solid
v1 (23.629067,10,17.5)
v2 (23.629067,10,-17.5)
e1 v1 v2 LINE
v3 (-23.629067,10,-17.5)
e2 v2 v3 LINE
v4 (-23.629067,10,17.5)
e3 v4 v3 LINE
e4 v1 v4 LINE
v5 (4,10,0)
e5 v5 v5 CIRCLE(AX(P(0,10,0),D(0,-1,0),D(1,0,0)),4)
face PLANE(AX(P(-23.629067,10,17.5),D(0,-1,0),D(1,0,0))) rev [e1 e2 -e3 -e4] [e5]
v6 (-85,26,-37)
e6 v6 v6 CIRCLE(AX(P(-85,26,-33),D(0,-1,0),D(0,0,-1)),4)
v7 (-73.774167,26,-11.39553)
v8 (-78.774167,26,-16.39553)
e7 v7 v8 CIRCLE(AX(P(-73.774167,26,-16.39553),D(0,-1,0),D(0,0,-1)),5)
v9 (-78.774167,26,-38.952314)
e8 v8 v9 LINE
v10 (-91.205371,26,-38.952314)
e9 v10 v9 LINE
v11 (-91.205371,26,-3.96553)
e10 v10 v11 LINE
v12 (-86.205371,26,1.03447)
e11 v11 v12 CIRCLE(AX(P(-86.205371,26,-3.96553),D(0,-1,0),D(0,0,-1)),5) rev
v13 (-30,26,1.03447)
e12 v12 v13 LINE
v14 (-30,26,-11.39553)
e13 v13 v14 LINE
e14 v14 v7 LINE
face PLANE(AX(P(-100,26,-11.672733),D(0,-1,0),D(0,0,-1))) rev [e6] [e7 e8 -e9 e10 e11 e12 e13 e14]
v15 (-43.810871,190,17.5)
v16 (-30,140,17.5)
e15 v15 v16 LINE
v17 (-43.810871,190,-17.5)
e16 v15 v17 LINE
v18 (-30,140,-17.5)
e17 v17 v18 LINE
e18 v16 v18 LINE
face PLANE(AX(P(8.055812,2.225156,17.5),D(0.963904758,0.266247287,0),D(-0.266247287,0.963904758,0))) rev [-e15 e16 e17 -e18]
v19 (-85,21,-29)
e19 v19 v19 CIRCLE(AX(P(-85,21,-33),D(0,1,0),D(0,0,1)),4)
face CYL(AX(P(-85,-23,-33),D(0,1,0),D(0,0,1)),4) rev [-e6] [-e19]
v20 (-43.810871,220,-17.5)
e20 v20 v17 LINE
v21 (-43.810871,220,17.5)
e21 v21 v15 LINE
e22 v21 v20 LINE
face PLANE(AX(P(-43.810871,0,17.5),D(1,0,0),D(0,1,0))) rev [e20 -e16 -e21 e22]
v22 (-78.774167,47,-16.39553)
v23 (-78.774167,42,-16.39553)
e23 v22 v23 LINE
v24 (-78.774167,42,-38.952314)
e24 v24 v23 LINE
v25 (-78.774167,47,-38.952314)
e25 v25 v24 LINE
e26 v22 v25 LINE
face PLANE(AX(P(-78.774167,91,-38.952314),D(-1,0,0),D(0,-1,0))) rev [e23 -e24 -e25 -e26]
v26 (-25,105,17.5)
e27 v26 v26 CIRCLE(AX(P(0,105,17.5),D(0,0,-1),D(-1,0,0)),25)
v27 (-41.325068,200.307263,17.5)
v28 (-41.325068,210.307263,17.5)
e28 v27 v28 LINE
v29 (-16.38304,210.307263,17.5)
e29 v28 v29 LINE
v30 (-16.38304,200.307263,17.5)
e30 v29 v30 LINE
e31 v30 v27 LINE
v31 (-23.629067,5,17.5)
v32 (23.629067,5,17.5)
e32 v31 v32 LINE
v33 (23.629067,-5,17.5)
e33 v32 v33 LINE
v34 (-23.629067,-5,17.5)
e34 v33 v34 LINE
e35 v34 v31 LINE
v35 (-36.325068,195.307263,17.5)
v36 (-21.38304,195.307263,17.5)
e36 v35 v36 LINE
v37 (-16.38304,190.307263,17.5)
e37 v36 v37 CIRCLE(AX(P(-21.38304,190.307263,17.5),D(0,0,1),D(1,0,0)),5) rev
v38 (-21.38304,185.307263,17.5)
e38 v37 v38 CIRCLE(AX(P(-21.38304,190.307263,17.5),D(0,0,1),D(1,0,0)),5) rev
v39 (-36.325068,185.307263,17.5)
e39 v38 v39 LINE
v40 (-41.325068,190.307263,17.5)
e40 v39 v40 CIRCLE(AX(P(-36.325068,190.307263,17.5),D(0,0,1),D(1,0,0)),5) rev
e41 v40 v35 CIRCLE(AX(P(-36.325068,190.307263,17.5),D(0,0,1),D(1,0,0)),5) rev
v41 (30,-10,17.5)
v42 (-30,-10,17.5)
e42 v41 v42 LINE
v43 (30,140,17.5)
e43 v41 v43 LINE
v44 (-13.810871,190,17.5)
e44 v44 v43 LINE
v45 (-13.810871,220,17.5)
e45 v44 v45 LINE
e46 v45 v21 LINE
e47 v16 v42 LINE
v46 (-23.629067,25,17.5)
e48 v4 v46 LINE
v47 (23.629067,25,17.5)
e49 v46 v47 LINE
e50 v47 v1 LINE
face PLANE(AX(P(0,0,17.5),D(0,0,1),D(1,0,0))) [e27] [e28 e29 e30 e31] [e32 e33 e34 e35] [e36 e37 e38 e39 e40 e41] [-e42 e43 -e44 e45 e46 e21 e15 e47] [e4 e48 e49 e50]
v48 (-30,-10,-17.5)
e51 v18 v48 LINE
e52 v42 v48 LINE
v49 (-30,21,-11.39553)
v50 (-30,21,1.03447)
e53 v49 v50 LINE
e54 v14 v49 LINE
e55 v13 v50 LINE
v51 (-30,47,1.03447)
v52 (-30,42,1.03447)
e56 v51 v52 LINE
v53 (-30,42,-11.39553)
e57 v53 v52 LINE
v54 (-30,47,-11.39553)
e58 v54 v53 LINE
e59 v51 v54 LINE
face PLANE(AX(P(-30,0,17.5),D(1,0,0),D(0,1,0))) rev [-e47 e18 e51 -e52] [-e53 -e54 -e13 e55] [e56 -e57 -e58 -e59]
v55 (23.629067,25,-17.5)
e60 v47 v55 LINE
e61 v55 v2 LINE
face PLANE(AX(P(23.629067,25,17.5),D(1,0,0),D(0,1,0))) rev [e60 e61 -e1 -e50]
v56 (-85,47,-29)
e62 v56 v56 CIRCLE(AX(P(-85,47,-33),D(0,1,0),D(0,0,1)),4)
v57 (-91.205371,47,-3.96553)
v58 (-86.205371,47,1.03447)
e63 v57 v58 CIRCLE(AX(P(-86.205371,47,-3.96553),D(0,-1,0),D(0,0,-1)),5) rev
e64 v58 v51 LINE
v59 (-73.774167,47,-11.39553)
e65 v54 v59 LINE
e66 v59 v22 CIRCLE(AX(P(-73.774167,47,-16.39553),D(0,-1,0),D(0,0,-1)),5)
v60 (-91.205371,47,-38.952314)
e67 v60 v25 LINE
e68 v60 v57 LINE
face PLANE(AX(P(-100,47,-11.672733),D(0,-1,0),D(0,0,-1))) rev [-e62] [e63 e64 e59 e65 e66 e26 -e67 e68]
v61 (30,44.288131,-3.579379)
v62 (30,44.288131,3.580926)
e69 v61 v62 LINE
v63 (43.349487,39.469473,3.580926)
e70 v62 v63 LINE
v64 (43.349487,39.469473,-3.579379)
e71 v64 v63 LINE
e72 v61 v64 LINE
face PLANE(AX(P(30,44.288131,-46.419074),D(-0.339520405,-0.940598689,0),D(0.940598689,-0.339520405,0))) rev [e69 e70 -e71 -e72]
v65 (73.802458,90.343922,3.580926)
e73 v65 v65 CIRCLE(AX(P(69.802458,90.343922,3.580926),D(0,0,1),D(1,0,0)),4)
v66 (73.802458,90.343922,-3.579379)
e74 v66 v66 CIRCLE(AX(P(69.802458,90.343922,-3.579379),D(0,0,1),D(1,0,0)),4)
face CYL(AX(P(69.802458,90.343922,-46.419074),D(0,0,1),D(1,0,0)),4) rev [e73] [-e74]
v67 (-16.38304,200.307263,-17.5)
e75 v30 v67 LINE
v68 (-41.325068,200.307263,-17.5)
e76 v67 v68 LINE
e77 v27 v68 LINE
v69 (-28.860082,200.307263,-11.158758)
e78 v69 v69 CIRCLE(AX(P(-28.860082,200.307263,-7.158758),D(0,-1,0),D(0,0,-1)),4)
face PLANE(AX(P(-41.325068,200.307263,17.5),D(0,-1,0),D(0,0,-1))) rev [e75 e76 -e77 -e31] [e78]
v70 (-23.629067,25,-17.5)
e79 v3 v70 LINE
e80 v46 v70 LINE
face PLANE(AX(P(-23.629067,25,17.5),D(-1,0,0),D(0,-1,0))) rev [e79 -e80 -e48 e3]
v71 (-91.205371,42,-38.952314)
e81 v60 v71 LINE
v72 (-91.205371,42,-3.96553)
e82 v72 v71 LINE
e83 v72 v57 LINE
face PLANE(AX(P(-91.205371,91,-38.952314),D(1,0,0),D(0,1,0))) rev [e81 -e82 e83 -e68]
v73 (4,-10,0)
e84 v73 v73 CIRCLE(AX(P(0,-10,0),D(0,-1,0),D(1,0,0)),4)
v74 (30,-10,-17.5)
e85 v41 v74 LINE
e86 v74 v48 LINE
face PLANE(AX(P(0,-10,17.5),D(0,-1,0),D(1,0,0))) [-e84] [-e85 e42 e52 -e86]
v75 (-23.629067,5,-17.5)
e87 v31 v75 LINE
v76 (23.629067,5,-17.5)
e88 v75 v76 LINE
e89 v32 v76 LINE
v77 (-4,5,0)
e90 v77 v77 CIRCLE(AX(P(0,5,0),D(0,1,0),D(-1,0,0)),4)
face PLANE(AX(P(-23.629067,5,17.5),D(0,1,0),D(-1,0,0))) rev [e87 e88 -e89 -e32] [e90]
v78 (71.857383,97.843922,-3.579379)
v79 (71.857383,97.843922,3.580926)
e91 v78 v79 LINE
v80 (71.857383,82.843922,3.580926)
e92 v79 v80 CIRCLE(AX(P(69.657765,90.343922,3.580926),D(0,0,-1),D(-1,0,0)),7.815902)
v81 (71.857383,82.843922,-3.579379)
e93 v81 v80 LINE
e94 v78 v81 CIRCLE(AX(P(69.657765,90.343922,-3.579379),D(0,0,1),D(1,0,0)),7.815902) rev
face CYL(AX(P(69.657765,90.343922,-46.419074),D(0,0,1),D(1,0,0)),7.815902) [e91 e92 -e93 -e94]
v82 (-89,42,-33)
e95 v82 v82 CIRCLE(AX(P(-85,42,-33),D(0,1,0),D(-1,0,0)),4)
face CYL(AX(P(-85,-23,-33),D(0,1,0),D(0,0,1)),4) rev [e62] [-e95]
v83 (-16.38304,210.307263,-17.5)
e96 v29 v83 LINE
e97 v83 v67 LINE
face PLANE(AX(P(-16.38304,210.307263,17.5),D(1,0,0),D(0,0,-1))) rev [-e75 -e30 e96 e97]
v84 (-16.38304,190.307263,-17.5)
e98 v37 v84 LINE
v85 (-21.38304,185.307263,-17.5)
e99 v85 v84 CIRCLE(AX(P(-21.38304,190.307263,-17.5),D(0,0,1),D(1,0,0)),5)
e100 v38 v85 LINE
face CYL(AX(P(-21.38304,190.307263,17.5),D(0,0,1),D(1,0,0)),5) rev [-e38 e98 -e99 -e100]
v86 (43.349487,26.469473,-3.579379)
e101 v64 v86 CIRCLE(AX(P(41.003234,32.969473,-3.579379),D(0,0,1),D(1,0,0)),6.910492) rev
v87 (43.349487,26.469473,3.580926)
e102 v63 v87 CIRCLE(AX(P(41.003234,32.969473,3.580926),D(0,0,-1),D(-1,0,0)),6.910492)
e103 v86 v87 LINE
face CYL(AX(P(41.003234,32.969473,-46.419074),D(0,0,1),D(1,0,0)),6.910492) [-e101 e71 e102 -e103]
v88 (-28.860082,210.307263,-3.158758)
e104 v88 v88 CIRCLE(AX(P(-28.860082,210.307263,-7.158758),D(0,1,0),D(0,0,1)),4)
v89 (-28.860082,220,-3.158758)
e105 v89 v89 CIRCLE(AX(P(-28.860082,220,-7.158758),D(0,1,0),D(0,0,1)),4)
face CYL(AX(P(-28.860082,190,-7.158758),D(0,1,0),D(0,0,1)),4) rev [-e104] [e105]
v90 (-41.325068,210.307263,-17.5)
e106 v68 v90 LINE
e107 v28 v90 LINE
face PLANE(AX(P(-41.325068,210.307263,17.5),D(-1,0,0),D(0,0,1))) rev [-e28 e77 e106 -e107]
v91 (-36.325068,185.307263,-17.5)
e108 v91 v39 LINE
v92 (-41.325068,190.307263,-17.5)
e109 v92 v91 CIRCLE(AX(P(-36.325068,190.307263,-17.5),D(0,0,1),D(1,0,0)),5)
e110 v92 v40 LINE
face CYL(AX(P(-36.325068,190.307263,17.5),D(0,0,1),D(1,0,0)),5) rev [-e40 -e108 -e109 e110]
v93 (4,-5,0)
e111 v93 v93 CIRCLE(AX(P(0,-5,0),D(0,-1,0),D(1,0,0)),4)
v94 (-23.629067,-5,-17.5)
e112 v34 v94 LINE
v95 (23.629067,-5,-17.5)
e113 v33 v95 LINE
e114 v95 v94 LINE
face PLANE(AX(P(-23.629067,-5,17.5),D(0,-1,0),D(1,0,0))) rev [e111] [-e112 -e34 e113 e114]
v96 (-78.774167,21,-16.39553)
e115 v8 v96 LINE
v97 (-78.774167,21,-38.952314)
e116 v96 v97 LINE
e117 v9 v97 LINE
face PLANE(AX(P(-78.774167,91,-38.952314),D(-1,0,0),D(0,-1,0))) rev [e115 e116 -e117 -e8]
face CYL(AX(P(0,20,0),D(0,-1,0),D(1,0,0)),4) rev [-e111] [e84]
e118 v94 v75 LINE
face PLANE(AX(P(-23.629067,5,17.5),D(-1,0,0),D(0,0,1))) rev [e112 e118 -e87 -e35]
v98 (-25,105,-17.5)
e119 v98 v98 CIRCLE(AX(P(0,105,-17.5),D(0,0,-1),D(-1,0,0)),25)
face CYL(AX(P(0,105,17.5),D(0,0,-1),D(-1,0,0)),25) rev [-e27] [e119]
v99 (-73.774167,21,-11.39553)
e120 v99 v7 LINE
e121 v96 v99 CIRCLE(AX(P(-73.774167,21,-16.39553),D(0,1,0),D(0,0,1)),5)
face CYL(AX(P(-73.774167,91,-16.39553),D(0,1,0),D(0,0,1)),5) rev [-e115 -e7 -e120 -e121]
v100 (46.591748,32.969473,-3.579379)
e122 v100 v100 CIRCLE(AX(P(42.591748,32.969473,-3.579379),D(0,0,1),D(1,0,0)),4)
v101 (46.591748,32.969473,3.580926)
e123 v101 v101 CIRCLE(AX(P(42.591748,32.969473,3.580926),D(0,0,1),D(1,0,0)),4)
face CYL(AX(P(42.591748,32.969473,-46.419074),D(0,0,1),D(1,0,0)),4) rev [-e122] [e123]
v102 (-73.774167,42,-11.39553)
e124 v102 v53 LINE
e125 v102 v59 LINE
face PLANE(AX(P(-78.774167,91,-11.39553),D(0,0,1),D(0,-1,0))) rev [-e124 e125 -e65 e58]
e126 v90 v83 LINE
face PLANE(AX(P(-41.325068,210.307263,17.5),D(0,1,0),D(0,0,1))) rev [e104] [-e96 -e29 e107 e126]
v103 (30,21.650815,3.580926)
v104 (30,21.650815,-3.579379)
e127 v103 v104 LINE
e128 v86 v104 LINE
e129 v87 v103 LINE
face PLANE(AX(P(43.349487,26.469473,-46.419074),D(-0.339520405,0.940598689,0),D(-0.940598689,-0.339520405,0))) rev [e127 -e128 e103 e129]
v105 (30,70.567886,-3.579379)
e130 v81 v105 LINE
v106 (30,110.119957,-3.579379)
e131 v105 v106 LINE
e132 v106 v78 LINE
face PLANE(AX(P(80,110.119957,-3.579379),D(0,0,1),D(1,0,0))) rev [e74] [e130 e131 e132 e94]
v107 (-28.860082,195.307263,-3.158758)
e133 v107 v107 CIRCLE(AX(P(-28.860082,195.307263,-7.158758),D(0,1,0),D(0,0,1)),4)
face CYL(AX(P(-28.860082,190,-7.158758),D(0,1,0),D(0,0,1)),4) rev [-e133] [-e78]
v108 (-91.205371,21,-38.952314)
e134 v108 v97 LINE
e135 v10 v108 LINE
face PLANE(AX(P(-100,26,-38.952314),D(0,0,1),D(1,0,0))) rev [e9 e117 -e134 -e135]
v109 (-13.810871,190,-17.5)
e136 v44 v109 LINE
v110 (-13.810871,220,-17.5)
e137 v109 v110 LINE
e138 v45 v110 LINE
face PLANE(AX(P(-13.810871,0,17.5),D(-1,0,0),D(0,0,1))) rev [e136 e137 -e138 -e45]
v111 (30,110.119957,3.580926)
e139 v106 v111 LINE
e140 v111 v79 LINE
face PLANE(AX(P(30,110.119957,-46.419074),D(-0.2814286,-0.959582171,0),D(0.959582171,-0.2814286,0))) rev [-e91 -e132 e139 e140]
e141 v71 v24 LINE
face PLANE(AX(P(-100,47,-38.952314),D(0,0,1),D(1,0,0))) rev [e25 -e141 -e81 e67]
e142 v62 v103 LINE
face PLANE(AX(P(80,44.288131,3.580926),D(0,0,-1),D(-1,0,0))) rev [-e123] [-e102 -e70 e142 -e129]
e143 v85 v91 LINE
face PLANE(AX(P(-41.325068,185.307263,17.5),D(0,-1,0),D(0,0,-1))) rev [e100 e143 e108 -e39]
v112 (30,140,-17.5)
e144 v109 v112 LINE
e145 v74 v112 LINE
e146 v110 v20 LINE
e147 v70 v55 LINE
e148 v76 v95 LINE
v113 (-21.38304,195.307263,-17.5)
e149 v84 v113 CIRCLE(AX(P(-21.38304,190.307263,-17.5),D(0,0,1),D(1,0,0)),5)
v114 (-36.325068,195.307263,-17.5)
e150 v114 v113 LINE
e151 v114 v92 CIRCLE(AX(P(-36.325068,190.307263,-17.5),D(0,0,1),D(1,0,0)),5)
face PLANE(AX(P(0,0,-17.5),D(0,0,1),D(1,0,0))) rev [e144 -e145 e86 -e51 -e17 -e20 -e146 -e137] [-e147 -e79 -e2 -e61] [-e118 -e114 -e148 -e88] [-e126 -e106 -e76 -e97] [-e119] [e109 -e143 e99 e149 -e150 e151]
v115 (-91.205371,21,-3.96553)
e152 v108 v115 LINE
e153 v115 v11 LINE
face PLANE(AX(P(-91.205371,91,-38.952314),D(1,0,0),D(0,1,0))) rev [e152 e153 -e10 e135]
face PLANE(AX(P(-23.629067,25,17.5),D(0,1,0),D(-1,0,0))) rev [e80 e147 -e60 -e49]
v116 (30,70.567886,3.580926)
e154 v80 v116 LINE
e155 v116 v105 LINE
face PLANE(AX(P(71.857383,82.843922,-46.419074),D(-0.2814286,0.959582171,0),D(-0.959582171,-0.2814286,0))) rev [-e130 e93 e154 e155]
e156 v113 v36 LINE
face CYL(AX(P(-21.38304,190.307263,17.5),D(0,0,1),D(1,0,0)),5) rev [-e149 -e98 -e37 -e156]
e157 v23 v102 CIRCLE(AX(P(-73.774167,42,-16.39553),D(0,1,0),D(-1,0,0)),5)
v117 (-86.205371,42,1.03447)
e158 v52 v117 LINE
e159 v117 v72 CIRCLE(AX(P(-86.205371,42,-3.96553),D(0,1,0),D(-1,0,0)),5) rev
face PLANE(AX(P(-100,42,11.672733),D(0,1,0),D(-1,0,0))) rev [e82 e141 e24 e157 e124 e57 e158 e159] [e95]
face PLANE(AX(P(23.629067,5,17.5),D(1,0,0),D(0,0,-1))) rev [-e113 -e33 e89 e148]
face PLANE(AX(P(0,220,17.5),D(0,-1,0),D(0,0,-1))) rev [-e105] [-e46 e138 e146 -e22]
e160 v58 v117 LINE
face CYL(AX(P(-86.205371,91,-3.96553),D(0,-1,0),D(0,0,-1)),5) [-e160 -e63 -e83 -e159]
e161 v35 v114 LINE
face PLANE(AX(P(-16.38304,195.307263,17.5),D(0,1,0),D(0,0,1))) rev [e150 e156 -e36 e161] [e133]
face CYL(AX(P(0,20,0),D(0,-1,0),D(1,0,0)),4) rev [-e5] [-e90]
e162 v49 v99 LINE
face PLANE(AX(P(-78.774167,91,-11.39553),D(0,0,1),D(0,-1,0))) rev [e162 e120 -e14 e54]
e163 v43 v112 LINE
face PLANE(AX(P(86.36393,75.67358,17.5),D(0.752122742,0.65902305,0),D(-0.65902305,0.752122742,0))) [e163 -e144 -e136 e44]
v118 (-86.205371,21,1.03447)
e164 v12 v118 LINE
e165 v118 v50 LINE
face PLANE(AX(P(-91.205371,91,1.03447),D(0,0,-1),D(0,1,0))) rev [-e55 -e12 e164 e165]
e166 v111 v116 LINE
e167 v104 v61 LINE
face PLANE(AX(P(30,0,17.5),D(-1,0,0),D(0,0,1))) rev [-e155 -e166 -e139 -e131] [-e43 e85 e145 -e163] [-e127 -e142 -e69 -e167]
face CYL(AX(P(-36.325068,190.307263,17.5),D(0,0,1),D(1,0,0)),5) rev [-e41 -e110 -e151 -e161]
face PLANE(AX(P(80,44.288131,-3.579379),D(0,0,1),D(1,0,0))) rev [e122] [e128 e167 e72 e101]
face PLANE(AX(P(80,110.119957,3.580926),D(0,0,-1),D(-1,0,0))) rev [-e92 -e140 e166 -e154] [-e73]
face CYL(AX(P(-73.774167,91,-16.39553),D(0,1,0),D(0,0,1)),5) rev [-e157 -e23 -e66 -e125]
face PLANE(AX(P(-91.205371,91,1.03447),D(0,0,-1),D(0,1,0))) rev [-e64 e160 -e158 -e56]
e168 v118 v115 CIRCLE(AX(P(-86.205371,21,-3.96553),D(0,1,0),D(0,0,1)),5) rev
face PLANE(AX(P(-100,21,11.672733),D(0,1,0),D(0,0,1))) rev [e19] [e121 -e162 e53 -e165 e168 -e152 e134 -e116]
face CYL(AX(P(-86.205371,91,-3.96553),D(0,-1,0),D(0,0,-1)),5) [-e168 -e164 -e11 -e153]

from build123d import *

# Parameters (mm, degrees)
BOSS_EXTRUDE1_DEPTH = 17.5
SKETCH6_W           = 24.942027916
SKETCH6_H           = 10
SKETCH6_W_2         = 47.258134024
SKETCH6_H_2         = 15
CUT_EXTRUDE1_DEPTH  = 228.033901494
SKETCH7_R           = 25
CUT_EXTRUDE2_DEPTH  = 228.033901494
SKETCH8_R           = 4
CUT_EXTRUDE3_DEPTH  = 30
SKETCH10_R          = 4
CUT_EXTRUDE4_DEPTH  = 30
SKETCH11_W          = 7.160304618
SKETCH11_H          = 39.552070702
SKETCH11_H_2        = 22.637315958
BOSS_EXTRUDE2_DEPTH = 50
SKETCH13_R          = 4
CUT_EXTRUDE5_DEPTH  = 50
CUT_EXTRUDE6_DEPTH  = 50
CUT_EXTRUDE7_DEPTH  = 50
BOSS_EXTRUDE3_DEPTH = 70
SKETCH19_R          = 4
CUT_EXTRUDE8_DEPTH  = 70
SKETCH20_W          = 48.774167315
SKETCH20_H          = 27.556784468
CUT_EXTRUDE9_DEPTH  = 70
CUT_EXTRUDE10_DEPTH = 70
FILLET1_R           = 5
FILLET2_R           = 5
FILLET3_R           = 5
FILLET4_R           = 5


with BuildPart() as part:
    # Sketch1 → Boss-Extrude1 (new, symmetric)
    with BuildSketch(Plane.XY):
        Polygon((30, -10), (-30, -10), (-30, 140), (-43.810871114, 190), (-43.810871114, 220), (-13.810871114, 220), (-13.810871114, 190), (30, 140), align=None)
    extrude(amount=BOSS_EXTRUDE1_DEPTH, both=True)

    # Sketch6 → Cut-Extrude1 (cut, through all)
    with BuildSketch(Plane(origin=(0, 0, -17.5), x_dir=(-1, 0, 0), z_dir=(0, 0, -1))):
        with Locations((28.85405418, 190.307263481)):
            Rectangle(SKETCH6_W, SKETCH6_H)
        Rectangle(SKETCH6_W_2, SKETCH6_H)
        with Locations((0, 17.5)):
            Rectangle(SKETCH6_W_2, SKETCH6_H_2)
        with Locations((28.85405418, 205.307263481)):
            Rectangle(SKETCH6_W, SKETCH6_H)
    extrude(amount=-CUT_EXTRUDE1_DEPTH, mode=Mode.SUBTRACT)

    # Sketch7 → Cut-Extrude2 (cut, through all)
    with BuildSketch(Plane(origin=(0, 0, -17.5), x_dir=(-1, 0, 0), z_dir=(0, 0, -1))):
        with Locations((0, 105)):
            Circle(SKETCH7_R)
    extrude(amount=-CUT_EXTRUDE2_DEPTH, mode=Mode.SUBTRACT)

    # Sketch8 → Cut-Extrude3 (cut)
    with BuildSketch(Plane(origin=(0, 220, 0), x_dir=(1, 0, 0), z_dir=(0, 1, 0))):
        with Locations(Location((-28.860081831, 7.158757746, 0), (0, 0, 270))):
            Circle(SKETCH8_R)
    extrude(amount=-CUT_EXTRUDE3_DEPTH, mode=Mode.SUBTRACT)

    # Sketch10 → Cut-Extrude4 (cut)
    with BuildSketch(Plane.XZ.offset(10)):
        Circle(SKETCH10_R)
    extrude(amount=-CUT_EXTRUDE4_DEPTH, mode=Mode.SUBTRACT)

    # Sketch11 → Boss-Extrude2 (add)
    with BuildSketch(Plane(origin=(30, 0, 0), x_dir=(0, 0, -1), z_dir=(1, 0, 0))):
        with Locations((-0.000773436, 90.343921661)):
            Rectangle(SKETCH11_W, SKETCH11_H)
        with Locations((-0.000773436, 32.969473472)):
            Rectangle(SKETCH11_W, SKETCH11_H_2)
    extrude(amount=BOSS_EXTRUDE2_DEPTH)

    # Sketch13 → Cut-Extrude5 (cut)
    with BuildSketch(Plane.XY.offset(3.580925745)):
        with Locations((69.802457577, 90.343921661)):
            Circle(SKETCH13_R)
        with Locations((42.591748381, 32.969473472)):
            Circle(SKETCH13_R)
    extrude(amount=-CUT_EXTRUDE5_DEPTH, mode=Mode.SUBTRACT)

    # Sketch14 → Cut-Extrude6 (cut)
    with BuildSketch(Plane.XY.offset(3.580925745)):
        with BuildLine():
            Line((30, 110.119957012), (71.857382865, 97.843921661))
            ThreePointArc((71.857382865, 97.843921661), (77.47366635, 90.343921661), (71.857382865, 82.843921661))
            Line((71.857382865, 82.843921661), (30, 70.56788631))
            Line((30, 70.56788631), (80, 70.56788631))
            Line((80, 70.56788631), (80, 110.119957012))
            Line((80, 110.119957012), (30, 110.119957012))
        make_face()
    extrude(amount=-CUT_EXTRUDE6_DEPTH, mode=Mode.SUBTRACT)

    # Sketch15 → Cut-Extrude7 (cut)
    with BuildSketch(Plane.XY.offset(3.580925745)):
        with BuildLine():
            Line((30, 44.288131451), (43.349487429, 39.469473472))
            ThreePointArc((43.349487429, 39.469473472), (47.913726584, 32.969473472), (43.349487429, 26.469473472))
            Line((43.349487429, 26.469473472), (30, 21.650815493))
            Line((30, 21.650815493), (80, 21.650815493))
            Line((80, 21.650815493), (80, 44.288131451))
            Line((80, 44.288131451), (30, 44.288131451))
        make_face()
    extrude(amount=-CUT_EXTRUDE7_DEPTH, mode=Mode.SUBTRACT)

    # Sketch18 → Boss-Extrude3 (add)
    with BuildSketch(Plane.ZY.offset(30)):
        Polygon((11.672732765, 47), (-11.672732765, 47), (-38.952313989, 47), (-38.952313989, 42), (-11.672732765, 42), (11.672732765, 42), align=None)
        Polygon((-11.672732765, 26), (-38.952313989, 26), (-38.952313989, 21), (-11.672732765, 21), (11.672732765, 21), (11.672732765, 26), align=None)
    extrude(amount=BOSS_EXTRUDE3_DEPTH)

    # Sketch19 → Cut-Extrude8 (cut)
    with BuildSketch(Plane(origin=(0, 47, 0), x_dir=(1, 0, 0), z_dir=(0, 1, 0))):
        with Locations(Location((-85, 33, 0), (0, 0, 270))):
            Circle(SKETCH19_R)
    extrude(amount=-CUT_EXTRUDE8_DEPTH, mode=Mode.SUBTRACT)

    # Sketch20 → Cut-Extrude9 (cut)
    with BuildSketch(Plane.XZ.offset(-21)):
        with Locations((-54.387083657, -25.173921755)):
            Rectangle(SKETCH20_W, SKETCH20_H)
    extrude(amount=-CUT_EXTRUDE9_DEPTH, mode=Mode.SUBTRACT)

    # Sketch22 → Cut-Extrude10 (cut)
    with BuildSketch(Plane.XZ.offset(-21)):
        Polygon((-91.205371371, -38.952313989), (-91.205371371, 1.034470479), (-30, 1.034470479), (-30, 11.672732765), (-100, 11.672732765), (-100, -38.952313989), align=None)
    extrude(amount=-CUT_EXTRUDE10_DEPTH, mode=Mode.SUBTRACT)

    # Fillet1
    fillet1_edges = [part.edges().sort_by_distance(p)[0] for p in [
        (-78.774167315, 44.5, -11.395529521),
    ]]
    fillet(fillet1_edges, radius=FILLET1_R)

    # Fillet2
    fillet2_edges = [part.edges().sort_by_distance(p)[0] for p in [
        (-78.774167315, 23.5, -11.395529521),
    ]]
    fillet(fillet2_edges, radius=FILLET2_R)

    # Fillet3
    fillet3_edges = [part.edges().sort_by_distance(p)[0] for p in [
        (-91.205371371, 44.5, 1.034470479),
        (-91.205371371, 23.5, 1.034470479),
    ]]
    fillet(fillet3_edges, radius=FILLET3_R)

    # Fillet4
    fillet4_edges = [part.edges().sort_by_distance(p)[0] for p in [
        (-41.325068138, 185.307263481, 0),
        (-16.383040222, 185.307263481, 0),
        (-16.383040222, 195.307263481, 0),
        (-41.325068138, 195.307263481, 0),
    ]]
    fillet(fillet4_edges, radius=FILLET4_R - 0.0001)  # a hair under: the kernel refuses the full size


solid = part.part
